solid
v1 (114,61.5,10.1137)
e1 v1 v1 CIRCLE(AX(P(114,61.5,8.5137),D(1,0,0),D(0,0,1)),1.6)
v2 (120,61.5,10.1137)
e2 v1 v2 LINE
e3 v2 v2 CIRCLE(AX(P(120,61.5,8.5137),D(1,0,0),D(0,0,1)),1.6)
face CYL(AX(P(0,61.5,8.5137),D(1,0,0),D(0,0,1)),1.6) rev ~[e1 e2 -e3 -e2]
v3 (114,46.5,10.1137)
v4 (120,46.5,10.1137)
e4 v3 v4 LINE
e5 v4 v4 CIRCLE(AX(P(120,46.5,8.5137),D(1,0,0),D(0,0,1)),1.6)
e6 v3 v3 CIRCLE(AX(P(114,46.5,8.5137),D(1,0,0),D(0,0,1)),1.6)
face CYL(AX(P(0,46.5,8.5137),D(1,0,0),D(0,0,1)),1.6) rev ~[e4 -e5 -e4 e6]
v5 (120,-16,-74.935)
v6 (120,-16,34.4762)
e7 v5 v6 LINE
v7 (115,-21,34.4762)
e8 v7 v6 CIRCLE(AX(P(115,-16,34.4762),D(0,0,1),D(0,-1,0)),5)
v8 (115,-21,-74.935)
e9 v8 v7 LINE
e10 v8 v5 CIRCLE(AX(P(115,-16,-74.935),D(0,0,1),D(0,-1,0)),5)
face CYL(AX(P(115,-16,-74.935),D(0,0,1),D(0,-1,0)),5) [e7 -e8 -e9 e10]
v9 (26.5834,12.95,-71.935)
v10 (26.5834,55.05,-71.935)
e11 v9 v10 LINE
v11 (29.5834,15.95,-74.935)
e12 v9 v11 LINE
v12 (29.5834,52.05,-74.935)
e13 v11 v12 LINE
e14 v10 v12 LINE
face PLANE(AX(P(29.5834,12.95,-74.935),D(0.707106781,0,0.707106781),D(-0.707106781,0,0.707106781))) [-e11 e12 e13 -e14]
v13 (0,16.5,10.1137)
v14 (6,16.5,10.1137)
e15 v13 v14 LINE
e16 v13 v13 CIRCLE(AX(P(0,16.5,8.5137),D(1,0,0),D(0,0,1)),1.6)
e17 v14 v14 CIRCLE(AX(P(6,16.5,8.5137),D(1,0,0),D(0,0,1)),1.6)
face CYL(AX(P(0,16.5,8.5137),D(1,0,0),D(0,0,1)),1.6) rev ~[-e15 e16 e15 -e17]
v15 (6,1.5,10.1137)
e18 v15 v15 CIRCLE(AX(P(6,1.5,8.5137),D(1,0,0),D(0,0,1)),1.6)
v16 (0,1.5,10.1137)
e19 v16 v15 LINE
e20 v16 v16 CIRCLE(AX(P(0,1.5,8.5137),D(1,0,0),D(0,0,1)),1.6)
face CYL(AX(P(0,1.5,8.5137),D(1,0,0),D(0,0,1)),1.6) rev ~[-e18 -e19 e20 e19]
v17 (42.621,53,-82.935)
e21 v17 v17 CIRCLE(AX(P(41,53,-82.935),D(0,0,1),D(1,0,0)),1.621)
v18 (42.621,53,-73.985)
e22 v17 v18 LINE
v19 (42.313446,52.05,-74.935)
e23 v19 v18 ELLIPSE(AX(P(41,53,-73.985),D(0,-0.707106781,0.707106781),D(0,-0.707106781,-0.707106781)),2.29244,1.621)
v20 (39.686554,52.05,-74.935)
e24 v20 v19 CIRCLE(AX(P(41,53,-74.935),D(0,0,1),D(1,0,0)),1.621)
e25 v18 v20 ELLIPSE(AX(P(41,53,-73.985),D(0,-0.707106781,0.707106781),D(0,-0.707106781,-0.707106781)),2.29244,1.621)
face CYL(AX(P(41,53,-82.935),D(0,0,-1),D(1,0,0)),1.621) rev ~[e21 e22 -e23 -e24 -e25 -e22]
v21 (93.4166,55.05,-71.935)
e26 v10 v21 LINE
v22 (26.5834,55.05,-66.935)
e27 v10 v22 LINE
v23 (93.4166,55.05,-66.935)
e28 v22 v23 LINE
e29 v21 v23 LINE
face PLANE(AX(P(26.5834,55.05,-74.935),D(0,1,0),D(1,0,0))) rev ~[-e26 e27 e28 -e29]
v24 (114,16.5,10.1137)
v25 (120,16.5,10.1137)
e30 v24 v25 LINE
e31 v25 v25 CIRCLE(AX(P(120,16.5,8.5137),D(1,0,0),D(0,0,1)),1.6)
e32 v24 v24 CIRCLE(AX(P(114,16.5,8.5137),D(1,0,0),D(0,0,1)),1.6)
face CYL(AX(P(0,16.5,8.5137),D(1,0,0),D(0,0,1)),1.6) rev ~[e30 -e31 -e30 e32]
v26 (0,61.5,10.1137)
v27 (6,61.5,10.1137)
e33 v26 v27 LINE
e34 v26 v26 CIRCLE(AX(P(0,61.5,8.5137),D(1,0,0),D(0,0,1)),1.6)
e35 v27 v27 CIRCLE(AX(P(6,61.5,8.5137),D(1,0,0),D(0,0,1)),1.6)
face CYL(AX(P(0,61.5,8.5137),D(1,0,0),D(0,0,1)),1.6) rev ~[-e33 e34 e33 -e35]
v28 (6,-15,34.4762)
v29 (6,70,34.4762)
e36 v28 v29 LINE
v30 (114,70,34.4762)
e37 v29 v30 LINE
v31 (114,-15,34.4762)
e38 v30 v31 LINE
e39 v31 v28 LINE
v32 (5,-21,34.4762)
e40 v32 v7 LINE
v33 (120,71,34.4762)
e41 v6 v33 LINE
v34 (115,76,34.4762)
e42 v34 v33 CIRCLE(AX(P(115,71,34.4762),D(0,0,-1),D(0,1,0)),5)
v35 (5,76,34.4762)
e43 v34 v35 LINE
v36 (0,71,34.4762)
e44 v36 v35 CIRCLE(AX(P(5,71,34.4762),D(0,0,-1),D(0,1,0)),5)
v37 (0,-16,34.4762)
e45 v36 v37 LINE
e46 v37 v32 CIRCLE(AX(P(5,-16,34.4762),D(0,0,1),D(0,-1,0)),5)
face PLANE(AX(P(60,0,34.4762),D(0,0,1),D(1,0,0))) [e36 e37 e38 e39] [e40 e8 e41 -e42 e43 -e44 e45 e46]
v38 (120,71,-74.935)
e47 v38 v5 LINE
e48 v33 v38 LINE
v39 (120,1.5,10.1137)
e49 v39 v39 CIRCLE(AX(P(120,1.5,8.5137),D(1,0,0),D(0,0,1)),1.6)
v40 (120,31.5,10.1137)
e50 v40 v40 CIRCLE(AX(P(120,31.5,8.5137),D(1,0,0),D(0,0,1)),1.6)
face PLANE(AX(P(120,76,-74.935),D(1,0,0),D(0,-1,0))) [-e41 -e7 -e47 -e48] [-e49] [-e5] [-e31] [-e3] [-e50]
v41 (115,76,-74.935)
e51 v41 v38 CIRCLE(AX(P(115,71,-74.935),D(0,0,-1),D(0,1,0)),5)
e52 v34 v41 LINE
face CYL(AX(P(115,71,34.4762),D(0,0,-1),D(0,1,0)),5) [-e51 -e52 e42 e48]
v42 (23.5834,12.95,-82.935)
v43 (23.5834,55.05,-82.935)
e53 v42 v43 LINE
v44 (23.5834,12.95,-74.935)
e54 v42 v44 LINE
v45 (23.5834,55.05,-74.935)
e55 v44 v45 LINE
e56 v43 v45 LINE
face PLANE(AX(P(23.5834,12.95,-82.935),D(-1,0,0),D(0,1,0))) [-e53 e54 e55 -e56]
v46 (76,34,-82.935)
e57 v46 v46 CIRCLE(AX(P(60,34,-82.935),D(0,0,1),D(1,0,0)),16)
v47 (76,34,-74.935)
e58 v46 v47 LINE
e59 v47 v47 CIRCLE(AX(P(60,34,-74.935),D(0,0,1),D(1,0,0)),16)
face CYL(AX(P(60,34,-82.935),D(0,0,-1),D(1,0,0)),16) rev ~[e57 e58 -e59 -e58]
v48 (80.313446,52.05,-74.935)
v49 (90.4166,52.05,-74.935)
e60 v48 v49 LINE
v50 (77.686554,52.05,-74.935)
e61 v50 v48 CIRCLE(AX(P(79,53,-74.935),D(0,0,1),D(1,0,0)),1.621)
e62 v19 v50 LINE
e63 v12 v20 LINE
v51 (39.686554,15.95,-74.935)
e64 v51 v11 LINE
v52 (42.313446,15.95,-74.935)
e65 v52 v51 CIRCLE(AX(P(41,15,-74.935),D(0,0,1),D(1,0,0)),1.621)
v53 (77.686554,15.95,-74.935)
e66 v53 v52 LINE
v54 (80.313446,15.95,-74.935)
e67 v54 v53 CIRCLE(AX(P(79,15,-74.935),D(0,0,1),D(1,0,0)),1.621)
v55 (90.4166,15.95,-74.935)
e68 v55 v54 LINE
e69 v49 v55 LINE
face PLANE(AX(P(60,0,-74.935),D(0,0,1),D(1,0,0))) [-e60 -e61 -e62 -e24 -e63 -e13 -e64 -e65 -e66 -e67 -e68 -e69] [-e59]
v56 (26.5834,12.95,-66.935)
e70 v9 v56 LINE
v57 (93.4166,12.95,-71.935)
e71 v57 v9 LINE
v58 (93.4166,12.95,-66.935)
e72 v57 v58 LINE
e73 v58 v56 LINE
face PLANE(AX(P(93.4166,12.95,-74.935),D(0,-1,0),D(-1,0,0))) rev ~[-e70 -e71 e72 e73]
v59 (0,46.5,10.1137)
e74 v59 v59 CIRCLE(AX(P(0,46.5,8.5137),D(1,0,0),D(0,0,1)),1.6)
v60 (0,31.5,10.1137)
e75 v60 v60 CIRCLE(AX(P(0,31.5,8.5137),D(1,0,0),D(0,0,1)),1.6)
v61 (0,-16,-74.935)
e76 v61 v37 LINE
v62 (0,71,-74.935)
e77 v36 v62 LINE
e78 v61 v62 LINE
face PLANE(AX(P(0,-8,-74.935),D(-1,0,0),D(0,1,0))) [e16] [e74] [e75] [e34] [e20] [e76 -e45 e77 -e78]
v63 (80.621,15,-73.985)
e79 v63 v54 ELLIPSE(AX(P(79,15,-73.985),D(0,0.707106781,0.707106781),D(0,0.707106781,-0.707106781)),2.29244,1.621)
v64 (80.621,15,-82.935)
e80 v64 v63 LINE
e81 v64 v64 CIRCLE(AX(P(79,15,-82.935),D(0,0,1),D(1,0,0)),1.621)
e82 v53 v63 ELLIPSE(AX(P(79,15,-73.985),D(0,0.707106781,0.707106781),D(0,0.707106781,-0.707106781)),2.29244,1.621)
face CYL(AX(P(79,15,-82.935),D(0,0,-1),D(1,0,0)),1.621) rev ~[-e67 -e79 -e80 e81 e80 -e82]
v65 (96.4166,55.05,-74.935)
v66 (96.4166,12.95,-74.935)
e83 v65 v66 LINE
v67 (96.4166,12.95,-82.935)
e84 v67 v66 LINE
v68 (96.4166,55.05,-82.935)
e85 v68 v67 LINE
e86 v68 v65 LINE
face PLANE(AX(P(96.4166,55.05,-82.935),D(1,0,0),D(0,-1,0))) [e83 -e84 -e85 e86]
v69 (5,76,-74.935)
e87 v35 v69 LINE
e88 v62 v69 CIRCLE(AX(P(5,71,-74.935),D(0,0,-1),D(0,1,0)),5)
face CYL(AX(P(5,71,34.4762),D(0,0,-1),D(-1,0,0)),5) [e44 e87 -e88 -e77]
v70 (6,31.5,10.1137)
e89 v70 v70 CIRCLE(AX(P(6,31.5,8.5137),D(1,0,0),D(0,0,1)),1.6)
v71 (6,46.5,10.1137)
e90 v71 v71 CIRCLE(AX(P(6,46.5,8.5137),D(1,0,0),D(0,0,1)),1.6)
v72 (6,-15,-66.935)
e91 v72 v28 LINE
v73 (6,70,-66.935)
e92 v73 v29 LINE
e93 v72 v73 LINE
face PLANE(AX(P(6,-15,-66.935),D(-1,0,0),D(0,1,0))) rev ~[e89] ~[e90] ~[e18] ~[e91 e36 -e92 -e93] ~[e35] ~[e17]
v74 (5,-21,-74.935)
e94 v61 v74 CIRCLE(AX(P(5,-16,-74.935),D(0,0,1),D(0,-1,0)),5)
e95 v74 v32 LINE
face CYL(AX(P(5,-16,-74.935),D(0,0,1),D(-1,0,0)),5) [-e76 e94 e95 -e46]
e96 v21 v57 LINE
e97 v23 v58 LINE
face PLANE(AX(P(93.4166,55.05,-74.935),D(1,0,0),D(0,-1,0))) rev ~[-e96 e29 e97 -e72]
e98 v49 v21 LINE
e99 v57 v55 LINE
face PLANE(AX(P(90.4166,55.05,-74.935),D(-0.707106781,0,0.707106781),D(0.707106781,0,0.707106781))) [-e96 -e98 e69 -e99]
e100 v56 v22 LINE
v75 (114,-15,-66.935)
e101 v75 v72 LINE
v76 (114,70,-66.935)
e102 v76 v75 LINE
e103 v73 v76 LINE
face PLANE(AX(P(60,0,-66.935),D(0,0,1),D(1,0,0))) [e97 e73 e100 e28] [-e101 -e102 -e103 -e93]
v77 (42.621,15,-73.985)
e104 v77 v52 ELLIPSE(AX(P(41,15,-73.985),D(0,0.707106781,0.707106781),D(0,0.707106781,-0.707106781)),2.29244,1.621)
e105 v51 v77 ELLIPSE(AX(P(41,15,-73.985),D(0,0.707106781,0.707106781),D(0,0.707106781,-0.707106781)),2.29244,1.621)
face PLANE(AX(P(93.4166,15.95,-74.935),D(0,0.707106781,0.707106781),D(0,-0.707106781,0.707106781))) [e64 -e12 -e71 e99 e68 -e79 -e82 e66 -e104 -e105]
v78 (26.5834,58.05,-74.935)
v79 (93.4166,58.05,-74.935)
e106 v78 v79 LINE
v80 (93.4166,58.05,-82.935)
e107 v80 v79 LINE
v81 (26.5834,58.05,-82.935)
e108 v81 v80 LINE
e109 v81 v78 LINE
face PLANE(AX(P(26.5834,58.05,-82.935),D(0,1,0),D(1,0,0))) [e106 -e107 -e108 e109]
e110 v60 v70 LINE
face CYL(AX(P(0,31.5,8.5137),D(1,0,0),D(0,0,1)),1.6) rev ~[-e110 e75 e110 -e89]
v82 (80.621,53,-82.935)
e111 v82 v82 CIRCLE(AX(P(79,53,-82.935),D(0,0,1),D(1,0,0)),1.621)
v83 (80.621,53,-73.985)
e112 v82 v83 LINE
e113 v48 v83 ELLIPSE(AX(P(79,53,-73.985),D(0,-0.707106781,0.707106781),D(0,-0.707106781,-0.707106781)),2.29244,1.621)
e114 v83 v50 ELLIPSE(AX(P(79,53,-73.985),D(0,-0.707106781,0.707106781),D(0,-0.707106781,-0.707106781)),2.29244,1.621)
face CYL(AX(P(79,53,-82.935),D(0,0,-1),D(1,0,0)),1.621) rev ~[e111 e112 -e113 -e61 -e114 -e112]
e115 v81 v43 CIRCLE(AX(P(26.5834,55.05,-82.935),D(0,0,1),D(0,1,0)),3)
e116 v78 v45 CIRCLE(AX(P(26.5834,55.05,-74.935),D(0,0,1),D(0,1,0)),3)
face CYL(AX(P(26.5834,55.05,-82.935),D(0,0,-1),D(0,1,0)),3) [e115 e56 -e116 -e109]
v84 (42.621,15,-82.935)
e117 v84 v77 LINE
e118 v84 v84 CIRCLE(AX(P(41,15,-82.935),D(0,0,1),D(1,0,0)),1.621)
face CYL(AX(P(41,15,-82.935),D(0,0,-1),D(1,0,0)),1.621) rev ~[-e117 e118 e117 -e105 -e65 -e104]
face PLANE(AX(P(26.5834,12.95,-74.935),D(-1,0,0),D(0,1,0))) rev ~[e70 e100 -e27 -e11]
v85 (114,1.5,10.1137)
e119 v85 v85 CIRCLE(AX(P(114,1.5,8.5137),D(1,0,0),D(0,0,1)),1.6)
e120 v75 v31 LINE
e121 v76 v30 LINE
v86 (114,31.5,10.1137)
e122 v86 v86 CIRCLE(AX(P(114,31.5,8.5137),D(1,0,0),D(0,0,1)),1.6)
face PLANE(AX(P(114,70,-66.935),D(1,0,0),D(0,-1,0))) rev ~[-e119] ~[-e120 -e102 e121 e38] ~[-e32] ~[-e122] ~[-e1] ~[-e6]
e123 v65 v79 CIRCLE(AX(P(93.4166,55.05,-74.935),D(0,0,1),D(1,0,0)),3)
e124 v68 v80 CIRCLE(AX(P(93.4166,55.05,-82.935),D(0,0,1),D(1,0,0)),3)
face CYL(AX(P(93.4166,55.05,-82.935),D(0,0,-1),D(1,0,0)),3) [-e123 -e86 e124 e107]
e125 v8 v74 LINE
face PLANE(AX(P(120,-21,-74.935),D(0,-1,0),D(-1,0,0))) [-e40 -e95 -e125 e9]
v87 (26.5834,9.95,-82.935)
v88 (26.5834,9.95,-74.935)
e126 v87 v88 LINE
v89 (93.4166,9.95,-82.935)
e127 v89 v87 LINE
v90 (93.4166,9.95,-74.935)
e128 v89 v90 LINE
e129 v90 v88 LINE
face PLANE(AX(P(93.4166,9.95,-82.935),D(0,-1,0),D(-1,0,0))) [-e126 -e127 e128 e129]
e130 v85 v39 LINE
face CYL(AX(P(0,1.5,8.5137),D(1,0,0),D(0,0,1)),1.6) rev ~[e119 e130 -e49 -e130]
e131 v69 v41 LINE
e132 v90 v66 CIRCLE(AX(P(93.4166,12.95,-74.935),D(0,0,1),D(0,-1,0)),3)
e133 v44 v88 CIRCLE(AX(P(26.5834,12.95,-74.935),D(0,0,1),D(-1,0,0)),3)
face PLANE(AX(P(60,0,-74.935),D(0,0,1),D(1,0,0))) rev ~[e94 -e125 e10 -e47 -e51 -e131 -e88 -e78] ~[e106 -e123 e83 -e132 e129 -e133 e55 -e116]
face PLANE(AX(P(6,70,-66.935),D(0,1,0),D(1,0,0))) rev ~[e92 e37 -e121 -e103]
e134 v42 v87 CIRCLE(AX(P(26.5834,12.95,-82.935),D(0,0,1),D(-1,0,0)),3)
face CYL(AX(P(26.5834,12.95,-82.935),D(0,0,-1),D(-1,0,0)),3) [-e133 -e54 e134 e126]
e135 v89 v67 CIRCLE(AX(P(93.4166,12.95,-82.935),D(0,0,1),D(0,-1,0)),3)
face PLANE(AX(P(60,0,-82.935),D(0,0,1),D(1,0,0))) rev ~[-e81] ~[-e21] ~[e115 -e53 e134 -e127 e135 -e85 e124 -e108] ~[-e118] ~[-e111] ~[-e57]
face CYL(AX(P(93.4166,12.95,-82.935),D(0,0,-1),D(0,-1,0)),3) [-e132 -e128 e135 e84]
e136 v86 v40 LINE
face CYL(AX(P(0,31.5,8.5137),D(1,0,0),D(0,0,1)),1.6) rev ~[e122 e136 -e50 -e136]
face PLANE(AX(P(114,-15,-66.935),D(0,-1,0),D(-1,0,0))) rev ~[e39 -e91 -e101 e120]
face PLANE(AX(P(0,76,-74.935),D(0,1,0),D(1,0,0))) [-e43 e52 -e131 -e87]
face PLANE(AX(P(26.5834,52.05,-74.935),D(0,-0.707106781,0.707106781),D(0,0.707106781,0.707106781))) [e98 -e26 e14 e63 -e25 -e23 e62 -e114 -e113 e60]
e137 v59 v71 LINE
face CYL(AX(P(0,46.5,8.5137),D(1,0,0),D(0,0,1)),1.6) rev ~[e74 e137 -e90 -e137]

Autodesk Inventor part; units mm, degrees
ref_plane "YZ Plane" through (0, 0, 0) normal (1, 0, 0) x (0, 1, 0)
ref_plane "XZ Plane" through (0, 0, 0) normal (0, 1, 0) x (-1, 0, 0)
ref_plane "XY Plane" through (0, 0, 0) normal (0, 0, 1) x (1, 0, 0)
ref_plane "Arbeitsebene3" through (60, 0, -82.935) normal (0, 0, 1) x (1, 0, 0)
sketch "Skizze13" plane through (60, 0, -82.935) normal (0, 0, 1) x (1, 0, 0)
  line L0 (-37.4166, 8.45) -> (-37.4166, 59.55) projected
  ellipse E0 centre (23.8014, -114.2521) end of major axis (147.0034, -54.0467) minor radius 137.1256 (-36.404, 8.95) -> (-37.4166, 8.45) ccw projected
  line L1 (-36.404, 8.95) -> (36.404, 8.95) projected
  ellipse E1 centre (-23.8014, -114.2521) end of major axis (98.9007, -175.47) minor radius 137.1256 (37.4166, 8.45) -> (36.404, 8.95) ccw projected
  line L2 (37.4166, 59.55) -> (37.4166, 8.45) projected
  ellipse E2 centre (-23.8014, 182.2521) end of major axis (-147.0034, 122.0467) minor radius 137.1256 (36.404, 59.05) -> (37.4166, 59.55) ccw projected
  line L3 (36.404, 59.05) -> (-36.404, 59.05) projected
  ellipse E3 centre (23.8014, 182.2521) end of major axis (-98.9007, 243.47) minor radius 137.1256 (-37.4166, 59.55) -> (-36.404, 59.05) ccw projected
  arc A0 (11.7926, 47.5991) -> (-11.7926, 47.5991) centre (0, 34) ccw projected
  arc A1 (13.5991, 45.7926) -> (11.7926, 47.5991) centre (15, 49) ccw projected
  arc A2 (13.5991, 22.2074) -> (13.5991, 45.7926) centre (0, 34) ccw projected
  arc A3 (11.7926, 20.4009) -> (13.5991, 22.2074) centre (15, 19) ccw projected
  arc A4 (-11.7926, 20.4009) -> (11.7926, 20.4009) centre (0, 34) ccw projected
  arc A5 (-13.5991, 22.2074) -> (-11.7926, 20.4009) centre (-15, 19) ccw projected
  arc A6 (-13.5991, 45.7926) -> (-13.5991, 22.2074) centre (0, 34) ccw projected
  arc A7 (-11.7926, 47.5991) -> (-13.5991, 45.7926) centre (-15, 49) ccw projected
  circle A8 centre (19, 15) radius 1.621 projected
  circle A9 centre (19, 53) radius 1.621 projected
  circle A10 centre (-19, 15) radius 1.621 projected
  circle A11 centre (-19, 53) radius 1.621 projected
  circle A12 centre (0, 34) radius 16
  line L4 (-33.4166, 58.05) -> (33.4166, 58.05)
  line L5 (36.4166, 55.05) -> (36.4166, 12.95)
  line L6 (33.4166, 9.95) -> (-33.4166, 9.95)
  line L7 (-36.4166, 12.95) -> (-36.4166, 55.05)
  arc A13 (-33.4166, 58.05) -> (-36.4166, 55.05) centre (-33.4166, 55.05) ccw
  arc A14 (-36.4166, 12.95) -> (-33.4166, 9.95) centre (-33.4166, 12.95) ccw
  arc A15 (33.4166, 9.95) -> (36.4166, 12.95) centre (33.4166, 12.95) ccw
  arc A16 (36.4166, 55.05) -> (33.4166, 58.05) centre (33.4166, 55.05) ccw
  point P0 (-60, 0)
  dimension "d147" = 32
  dimension "d148" = 1
  dimension "d149" = 3
extrude "Extrusion11" add sketch "Skizze13" along normal blind 8 contours A1 A2 A3 A4 A5 A6 A7 A0 | L4 A16 L5 A15 L6 A14 L7 A13
sketch "Skizze14" plane through (60, 0, -74.935) normal (0, 0, 1) x (1, 0, 0)
  point P0 (-60, 0)
sketch "Skizze15" plane through (60, 0, -74.935) normal (0, 0, 1) x (1, 0, 0)
  line L0 (-33.541, 7.75) -> (-33.541, 50.25)
  line L1 (-33.4166, 9.95) -> (33.4166, 9.95)
  arc A0 (33.4166, 9.95) -> (36.4166, 12.95) centre (33.4166, 12.95) ccw
  line L2 (36.4166, 12.95) -> (36.4166, 55.05)
  arc A1 (36.4166, 55.05) -> (33.4166, 58.05) centre (33.4166, 55.05) ccw
  line L3 (33.4166, 58.05) -> (-33.4166, 58.05)
  arc A2 (-33.4166, 58.05) -> (-36.4166, 55.05) centre (-33.4166, 55.05) ccw
  line L4 (-36.4166, 55.05) -> (-36.4166, 12.95)
  arc A3 (-36.4166, 12.95) -> (-33.4166, 9.95) centre (-33.4166, 12.95) ccw
  circle A4 centre (0, 34) radius 16
  circle A5 centre (-19, 53) radius 1.621
  circle A6 centre (-19, 15) radius 1.621
  circle A7 centre (19, 53) radius 1.621
  circle A8 centre (19, 15) radius 1.621
  line L5 (-77.5, 76.5) -> (77.5, 76.5)
  line L6 (-66, 79) -> (-60, 79)
  line L7 (66, -21) -> (66, 79)
  line L8 (-66, 79) -> (-66, -21)
  line L9 (-77.5, 107.3475) -> (77.5, 107.3475)
  line L10 (-33.4166, 9.95) -> (33.4166, 9.95)
  arc A9 (33.4166, 9.95) -> (36.4166, 12.95) centre (33.4166, 12.95) ccw
  line L11 (36.4166, 12.95) -> (36.4166, 55.05)
  arc A10 (36.4166, 55.05) -> (33.4166, 58.05) centre (33.4166, 55.05) ccw
  line L12 (33.4166, 58.05) -> (-33.4166, 58.05)
  arc A11 (-33.4166, 58.05) -> (-36.4166, 55.05) centre (-33.4166, 55.05) ccw
  line L13 (-36.4166, 55.05) -> (-36.4166, 12.95)
  arc A12 (-36.4166, 12.95) -> (-33.4166, 9.95) centre (-33.4166, 12.95) ccw
  circle A13 centre (0, 34) radius 16
  circle A14 centre (-19, 53) radius 1.621
  circle A15 centre (-19, 15) radius 1.621
  circle A16 centre (19, 53) radius 1.621
  circle A17 centre (19, 15) radius 1.621
  line L14 (-33.4166, 55.05) -> (33.4166, 55.05)
  line L15 (33.4166, 55.05) -> (33.4166, 12.95)
  line L16 (33.4166, 12.95) -> (-33.4166, 12.95)
  line L17 (-33.4166, 12.95) -> (-33.4166, 55.05)
  line L18 (60, -8) -> (-60, -8)
  line L19 (-60, -8) -> (-60, 76)
  line L20 (-60, 76) -> (60, 76)
  line L21 (60, 76) -> (60, -8)
  line L22 (60, -8) -> (-60, 76) construction
  line L23 (-60, -8) -> (60, 76) construction
  line L24 (-60, -8) -> (60, -8)
  line L25 (60, -8) -> (60, -21)
  line L26 (60, -21) -> (-60, -21)
  line L27 (-60, -21) -> (-60, -8)
  point P0 (-60, 0)
  point P1 (60, -8)
extrude "Extrusion12" add sketch "Skizze15" along normal blind 8 contours A3 L4 A2 L3 A1 L2 A0 L1 | L25 L26 L27 L18 | L18 L19 L20 L21
chamfer "Fasen1" distance 3 angle 45 4 edges at (93.4166, 34, -74.935) (60, 12.95, -74.935) (26.5834, 34, -74.935) (60, 55.05, -74.935)
sketch "Skizze16" plane through (60, 0, -66.935) normal (0, 0, 1) x (1, 0, 0)
  line L0 (60, 76) -> (-60, 76) projected
  line L1 (-60, 76) -> (-60, -21) projected
  line L2 (-60, -21) -> (60, -21) projected
  line L3 (60, -21) -> (60, 76) projected
  line L4 (-33.4166, 55.05) -> (33.4166, 55.05) projected
  line L5 (33.4166, 55.05) -> (33.4166, 12.95) projected
  line L6 (33.4166, 12.95) -> (-33.4166, 12.95) projected
  line L7 (-33.4166, 12.95) -> (-33.4166, 55.05) projected
  line L8 (-54, 70) -> (54, 70)
  line L9 (54, 70) -> (54, -15)
  line L10 (54, -15) -> (-54, -15)
  line L11 (-54, -15) -> (-54, 70)
  dimension "d163" = 6
extrude "Extrusion13" add sketch "Skizze16" along normal up to surface (101.4112 mm away) contours L3 L2 L1 L0
fillet "Rundung3" radius 5 4 edges at (0, 76, -20.2294) (120, 76, -20.2294) (0, -21, -20.2294) (120, -21, -20.2294)
sketch "Skizze17" plane through (0, -16, -74.935) normal (-1, 0, 0) x (0, 0, 1)
  circle A0 centre (83.4487, 47.5) radius 1.6 projected
  circle A1 centre (83.4487, 32.5) radius 1.6 projected
  circle A2 centre (83.4487, 62.5) radius 1.6 projected
  circle A3 centre (83.4487, 17.5) radius 1.6 projected
  circle A4 centre (83.4487, 77.5) radius 1.6 projected
  line L0 (168.1612, 6.4) -> (168.1612, 4) projected
  line L1 (168.1612, 4) -> (162.6612, 4) projected
  line L2 (162.6612, 4) -> (162.6612, 6.4) projected
  line L3 (162.6612, 6.4) -> (168.1612, 6.4) projected
  line L4 (128.1612, 6.4) -> (128.1612, 4) projected
  line L5 (128.1612, 4) -> (122.6612, 4) projected
  line L6 (122.6612, 4) -> (122.6612, 6.4) projected
  line L7 (122.6612, 6.4) -> (128.1612, 6.4) projected
  line L8 (170.6987, 83.6) -> (170.6987, 86) projected
  line L9 (170.6987, 86) -> (176.1987, 86) projected
  line L10 (176.1987, 86) -> (176.1987, 83.6) projected
  line L11 (176.1987, 83.6) -> (170.6987, 83.6) projected
  line L12 (96.1987, 86) -> (96.1987, 83.6) projected
  line L13 (96.1987, 83.6) -> (90.6987, 83.6) projected
  line L14 (90.6987, 83.6) -> (90.6987, 86) projected
  line L15 (90.6987, 86) -> (96.1987, 86) projected
  line L16 (193.4487, 87) -> (193.2487, 87) projected
  line L17 (193.2487, 87) -> (193.2487, 89) projected
  line L18 (193.4487, 89) -> (193.4487, 91.1929) projected
  line L19 (190.5112, 89) -> (180.3112, 89) projected
  line L20 (180.3112, 89) -> (188.3487, 95) projected
  line L21 (188.3487, 95) -> (178.5487, 95) projected
  line L22 (178.5487, 95) -> (170.5112, 89) projected
  line L23 (170.5112, 89) -> (160.3112, 89) projected
  line L24 (160.3112, 89) -> (168.3487, 95) projected
  line L25 (168.3487, 95) -> (158.5487, 95) projected
  line L26 (158.5487, 95) -> (150.5112, 89) projected
  line L27 (150.5112, 89) -> (140.3112, 89) projected
  line L28 (140.3112, 89) -> (148.3487, 95) projected
  line L29 (148.3487, 95) -> (138.5487, 95) projected
  line L30 (138.5487, 95) -> (130.5112, 89) projected
  line L31 (130.5112, 89) -> (120.3112, 89) projected
  line L32 (120.3112, 89) -> (128.3487, 95) projected
  line L33 (128.3487, 95) -> (118.5487, 95) projected
  line L34 (118.5487, 95) -> (110.5112, 89) projected
  line L35 (110.5112, 89) -> (100.3112, 89) projected
  line L36 (100.3112, 89) -> (108.3487, 95) projected
  line L37 (108.3487, 95) -> (98.5487, 95) projected
  line L38 (98.5487, 95) -> (90.5112, 89) projected
  line L39 (90.5112, 89) -> (80.3112, 89) projected
  line L40 (80.3112, 89) -> (88.3487, 95) projected
  line L41 (88.3487, 95) -> (78.4487, 95) projected
  line L42 (120.3112, -5) -> (120.3112, 1) projected
  line L43 (120.3112, 1) -> (130.5112, 1) projected
  line L44 (130.5112, 1) -> (130.5112, -5) projected
  line L45 (140.3112, -5) -> (140.3112, 1) projected
  line L46 (140.3112, 1) -> (150.5112, 1) projected
  line L47 (150.5112, 1) -> (150.5112, -5) projected
  line L48 (160.3112, -5) -> (160.3112, 1) projected
  line L49 (160.3112, 1) -> (170.5112, 1) projected
  line L50 (170.5112, 1) -> (170.5112, -5) projected
  line L51 (180.4112, -5) -> (180.4112, 1) projected
  line L52 (180.4112, 1) -> (185.4112, 1) projected
  line L53 (193.2487, 89) -> (193.4487, 89) projected
  line L54 (193.4487, 91.1929) -> (190.5112, 89) projected
  line L55 (78.4487, 95) -> (78.4487, -5) projected
  line L56 (78.4487, -5) -> (120.3112, -5) projected
  line L57 (130.5112, -5) -> (140.3112, -5) projected
  line L58 (150.5112, -5) -> (160.3112, -5) projected
  line L59 (170.5112, -5) -> (180.4112, -5) projected
  line L60 (185.4112, 1) -> (185.4112, -5) projected
  line L61 (185.4112, -5) -> (193.4487, -5) projected
  line L62 (193.4487, -5) -> (193.4487, 87) projected
  point P0 (74.935, 16)
hole "Bohrung3" at (0, 61.5, 8.5137) at (0, 46.5, 8.5137) at (0, 31.5, 8.5137) at (0, 16.5, 8.5137) at (0, 1.5, 8.5137) direction (1, 0, 0) diameter 3.2 end through all
properties part number "OpenFrameAdapter"
